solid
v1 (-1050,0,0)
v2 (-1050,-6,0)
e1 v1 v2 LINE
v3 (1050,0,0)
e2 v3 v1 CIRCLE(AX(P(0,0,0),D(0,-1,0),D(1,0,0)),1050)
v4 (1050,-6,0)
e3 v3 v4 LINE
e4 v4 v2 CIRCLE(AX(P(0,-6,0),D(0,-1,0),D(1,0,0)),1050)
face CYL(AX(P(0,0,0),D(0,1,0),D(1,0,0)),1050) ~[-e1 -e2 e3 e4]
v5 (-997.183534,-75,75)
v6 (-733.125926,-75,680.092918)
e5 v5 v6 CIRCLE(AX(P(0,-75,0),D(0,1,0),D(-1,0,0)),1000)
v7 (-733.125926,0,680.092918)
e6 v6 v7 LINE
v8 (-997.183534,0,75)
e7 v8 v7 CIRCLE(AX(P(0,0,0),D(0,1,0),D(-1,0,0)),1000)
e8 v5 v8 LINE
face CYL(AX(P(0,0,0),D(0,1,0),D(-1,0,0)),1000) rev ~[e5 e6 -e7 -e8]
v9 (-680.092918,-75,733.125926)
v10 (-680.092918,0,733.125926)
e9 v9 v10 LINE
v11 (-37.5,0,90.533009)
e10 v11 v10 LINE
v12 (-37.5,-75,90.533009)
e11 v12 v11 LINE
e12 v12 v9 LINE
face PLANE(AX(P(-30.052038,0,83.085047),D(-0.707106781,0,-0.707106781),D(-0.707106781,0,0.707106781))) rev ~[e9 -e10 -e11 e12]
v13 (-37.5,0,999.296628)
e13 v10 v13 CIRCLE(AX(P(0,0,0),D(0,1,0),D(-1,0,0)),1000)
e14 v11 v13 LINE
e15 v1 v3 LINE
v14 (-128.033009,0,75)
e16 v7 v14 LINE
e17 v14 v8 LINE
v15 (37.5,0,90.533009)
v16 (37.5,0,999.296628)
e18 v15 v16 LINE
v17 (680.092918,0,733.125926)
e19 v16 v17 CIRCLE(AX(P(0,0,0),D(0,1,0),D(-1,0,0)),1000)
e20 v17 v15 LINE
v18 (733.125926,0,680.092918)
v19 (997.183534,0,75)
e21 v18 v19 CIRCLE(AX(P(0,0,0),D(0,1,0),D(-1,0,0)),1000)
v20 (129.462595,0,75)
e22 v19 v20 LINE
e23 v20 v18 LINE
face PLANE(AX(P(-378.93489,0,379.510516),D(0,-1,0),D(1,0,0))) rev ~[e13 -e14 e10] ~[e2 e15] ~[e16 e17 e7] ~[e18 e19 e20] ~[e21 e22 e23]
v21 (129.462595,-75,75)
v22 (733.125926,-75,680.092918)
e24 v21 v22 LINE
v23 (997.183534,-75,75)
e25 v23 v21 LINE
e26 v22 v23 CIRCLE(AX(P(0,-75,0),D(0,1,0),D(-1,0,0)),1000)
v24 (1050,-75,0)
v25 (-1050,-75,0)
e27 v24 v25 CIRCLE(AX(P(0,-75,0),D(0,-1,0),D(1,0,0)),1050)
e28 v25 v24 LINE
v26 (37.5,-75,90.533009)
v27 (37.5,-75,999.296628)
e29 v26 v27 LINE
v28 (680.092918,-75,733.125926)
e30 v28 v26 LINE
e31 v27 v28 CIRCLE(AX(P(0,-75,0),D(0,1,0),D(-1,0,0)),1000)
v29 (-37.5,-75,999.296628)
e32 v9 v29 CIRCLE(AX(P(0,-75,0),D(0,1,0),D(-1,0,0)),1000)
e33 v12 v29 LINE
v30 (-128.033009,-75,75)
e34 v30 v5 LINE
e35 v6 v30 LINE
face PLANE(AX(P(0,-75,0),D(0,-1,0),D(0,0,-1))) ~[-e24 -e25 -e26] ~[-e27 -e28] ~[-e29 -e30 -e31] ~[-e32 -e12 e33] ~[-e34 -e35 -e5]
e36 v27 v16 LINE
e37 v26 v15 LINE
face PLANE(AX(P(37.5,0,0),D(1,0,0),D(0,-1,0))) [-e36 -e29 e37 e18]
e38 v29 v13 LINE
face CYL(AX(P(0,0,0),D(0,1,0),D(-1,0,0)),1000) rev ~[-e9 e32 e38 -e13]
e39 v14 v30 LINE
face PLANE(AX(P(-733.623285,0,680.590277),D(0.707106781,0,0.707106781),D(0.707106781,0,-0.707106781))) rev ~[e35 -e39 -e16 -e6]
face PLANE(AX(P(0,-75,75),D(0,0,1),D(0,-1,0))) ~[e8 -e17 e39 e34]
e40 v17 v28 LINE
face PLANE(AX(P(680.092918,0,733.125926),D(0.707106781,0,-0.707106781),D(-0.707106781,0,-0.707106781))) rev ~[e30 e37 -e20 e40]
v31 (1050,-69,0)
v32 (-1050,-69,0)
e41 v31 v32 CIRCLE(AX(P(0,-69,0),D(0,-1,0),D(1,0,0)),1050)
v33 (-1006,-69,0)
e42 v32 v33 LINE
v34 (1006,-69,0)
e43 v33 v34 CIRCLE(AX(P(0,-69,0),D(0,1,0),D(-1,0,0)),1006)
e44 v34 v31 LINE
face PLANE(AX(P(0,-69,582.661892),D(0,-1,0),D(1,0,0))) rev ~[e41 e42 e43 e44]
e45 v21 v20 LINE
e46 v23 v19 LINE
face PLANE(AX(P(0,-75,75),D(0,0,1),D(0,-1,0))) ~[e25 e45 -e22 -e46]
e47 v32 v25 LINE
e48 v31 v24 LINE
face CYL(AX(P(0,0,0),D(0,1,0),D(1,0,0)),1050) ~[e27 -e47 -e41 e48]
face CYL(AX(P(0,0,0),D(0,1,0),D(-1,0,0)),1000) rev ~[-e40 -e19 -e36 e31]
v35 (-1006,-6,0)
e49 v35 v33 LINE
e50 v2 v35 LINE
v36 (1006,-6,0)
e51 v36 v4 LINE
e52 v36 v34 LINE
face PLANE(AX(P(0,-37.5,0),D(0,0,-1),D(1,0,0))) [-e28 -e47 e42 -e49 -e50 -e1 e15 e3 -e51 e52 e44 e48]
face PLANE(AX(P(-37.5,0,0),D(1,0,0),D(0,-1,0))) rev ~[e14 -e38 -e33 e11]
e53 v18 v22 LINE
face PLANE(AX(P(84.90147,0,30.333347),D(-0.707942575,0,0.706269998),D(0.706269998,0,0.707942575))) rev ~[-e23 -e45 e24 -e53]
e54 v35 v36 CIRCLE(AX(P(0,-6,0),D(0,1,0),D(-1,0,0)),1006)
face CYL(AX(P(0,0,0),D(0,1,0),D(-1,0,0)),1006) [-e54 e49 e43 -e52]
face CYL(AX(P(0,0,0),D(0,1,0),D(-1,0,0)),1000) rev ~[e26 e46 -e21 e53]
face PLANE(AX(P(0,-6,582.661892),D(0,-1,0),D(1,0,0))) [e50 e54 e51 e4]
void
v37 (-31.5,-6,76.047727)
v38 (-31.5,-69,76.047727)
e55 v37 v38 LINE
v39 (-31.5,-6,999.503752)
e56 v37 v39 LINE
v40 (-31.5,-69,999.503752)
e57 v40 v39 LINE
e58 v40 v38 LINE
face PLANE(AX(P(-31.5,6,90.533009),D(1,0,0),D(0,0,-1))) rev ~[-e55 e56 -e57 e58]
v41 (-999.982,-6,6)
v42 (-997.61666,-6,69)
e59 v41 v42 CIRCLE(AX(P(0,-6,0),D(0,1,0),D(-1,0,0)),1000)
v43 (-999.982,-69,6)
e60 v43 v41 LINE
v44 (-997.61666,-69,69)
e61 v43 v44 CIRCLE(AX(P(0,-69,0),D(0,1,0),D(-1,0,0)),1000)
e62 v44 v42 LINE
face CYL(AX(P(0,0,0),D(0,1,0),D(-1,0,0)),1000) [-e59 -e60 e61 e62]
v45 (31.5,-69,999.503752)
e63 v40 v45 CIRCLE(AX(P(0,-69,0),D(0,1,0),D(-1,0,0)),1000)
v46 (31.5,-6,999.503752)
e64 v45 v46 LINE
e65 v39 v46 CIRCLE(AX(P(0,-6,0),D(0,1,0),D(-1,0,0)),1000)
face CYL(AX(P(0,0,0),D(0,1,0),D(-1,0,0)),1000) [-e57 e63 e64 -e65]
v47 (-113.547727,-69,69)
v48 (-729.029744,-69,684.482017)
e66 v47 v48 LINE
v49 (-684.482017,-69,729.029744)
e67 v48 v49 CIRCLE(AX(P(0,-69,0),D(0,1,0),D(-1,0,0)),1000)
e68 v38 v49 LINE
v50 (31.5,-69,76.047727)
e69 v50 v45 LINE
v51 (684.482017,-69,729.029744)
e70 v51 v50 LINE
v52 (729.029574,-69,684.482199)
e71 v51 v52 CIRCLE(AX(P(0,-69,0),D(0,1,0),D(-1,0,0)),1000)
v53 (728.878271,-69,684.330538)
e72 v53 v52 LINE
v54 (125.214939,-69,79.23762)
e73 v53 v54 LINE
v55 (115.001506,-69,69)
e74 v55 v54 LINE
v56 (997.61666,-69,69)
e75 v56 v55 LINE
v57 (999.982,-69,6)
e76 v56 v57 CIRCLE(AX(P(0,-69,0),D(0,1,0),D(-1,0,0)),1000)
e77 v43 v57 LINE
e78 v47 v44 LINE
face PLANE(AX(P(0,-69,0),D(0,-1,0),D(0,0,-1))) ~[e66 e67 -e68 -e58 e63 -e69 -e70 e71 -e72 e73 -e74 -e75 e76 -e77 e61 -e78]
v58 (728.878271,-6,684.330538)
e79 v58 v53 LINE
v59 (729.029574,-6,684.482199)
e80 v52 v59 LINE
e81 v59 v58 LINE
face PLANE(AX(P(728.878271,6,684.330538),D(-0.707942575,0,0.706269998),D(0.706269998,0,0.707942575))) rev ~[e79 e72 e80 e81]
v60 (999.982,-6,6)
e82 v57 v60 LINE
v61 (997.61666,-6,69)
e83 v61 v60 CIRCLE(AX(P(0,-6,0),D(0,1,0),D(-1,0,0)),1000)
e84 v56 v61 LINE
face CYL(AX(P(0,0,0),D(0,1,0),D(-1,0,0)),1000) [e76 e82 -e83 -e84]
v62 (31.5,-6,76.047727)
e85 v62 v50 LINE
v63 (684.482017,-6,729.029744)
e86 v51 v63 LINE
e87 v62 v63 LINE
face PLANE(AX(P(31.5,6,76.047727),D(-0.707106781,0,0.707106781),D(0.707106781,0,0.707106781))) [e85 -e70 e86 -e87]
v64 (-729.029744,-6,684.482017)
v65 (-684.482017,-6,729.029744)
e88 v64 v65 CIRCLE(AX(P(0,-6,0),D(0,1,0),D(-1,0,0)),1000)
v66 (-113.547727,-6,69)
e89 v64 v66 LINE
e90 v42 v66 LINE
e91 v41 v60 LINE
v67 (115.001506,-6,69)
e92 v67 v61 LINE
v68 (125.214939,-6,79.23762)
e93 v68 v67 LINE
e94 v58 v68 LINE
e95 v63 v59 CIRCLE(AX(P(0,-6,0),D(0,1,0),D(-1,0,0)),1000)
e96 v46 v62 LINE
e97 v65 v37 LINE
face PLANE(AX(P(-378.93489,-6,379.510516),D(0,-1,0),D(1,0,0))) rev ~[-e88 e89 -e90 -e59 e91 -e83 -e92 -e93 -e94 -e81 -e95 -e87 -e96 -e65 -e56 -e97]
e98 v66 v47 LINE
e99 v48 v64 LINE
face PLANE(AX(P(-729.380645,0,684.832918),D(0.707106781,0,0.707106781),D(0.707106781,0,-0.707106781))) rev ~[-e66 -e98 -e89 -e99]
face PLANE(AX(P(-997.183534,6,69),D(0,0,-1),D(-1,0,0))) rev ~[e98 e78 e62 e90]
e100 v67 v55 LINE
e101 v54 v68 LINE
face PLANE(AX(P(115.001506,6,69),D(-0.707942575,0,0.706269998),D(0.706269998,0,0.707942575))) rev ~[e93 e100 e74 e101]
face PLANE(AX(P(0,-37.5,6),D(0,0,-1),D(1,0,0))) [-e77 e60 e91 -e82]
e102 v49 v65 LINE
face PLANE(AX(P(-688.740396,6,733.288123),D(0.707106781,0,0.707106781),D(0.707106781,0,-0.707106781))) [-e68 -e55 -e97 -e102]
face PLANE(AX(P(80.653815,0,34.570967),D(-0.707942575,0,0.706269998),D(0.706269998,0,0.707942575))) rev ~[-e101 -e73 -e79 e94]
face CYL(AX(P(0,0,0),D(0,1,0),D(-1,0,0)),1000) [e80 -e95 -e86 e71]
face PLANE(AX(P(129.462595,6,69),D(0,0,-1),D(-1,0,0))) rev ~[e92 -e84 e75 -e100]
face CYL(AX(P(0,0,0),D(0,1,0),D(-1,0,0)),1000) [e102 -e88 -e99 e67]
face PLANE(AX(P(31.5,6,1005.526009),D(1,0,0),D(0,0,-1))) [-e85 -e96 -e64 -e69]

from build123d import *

# Parameters (mm, degrees)
F1_DEPTH     = 75
F2_T         = -6
F3_W         = 75
F3_H         = 75
F4_DEPTH     = 1000
F6_W         = 75
F6_H         = 75
F7_DEPTH     = 1000
F9_DEPTH     = 75
F11_DEPTH    = 75
F12_T        = 6
F12_T3_DEPTH = 87
F12_T6_ANGLE = 180.000000001
F12_T8_ANGLE = 180.000000001


# Not quite as in the source:
# - a shell that OpenCascade refuses in one call is made with other operations: the cavity is built on its own and cut out


with BuildPart() as f1:
    # F0 (on Front) → F1 (new body)
    with BuildSketch(Plane.XZ):
        with BuildLine():
            ThreePointArc((707.1067811865, 707.1067811865), (923.8795325113, 382.6834323651), (1000, 0))
            Line((1000, 0), (1050, 0))
            ThreePointArc((1050, 0), (0, 1050), (-1050, 0))
            Line((-1050, 0), (-1000, 0))
            ThreePointArc((-1000, 0), (-923.8795325113, 382.6834323651), (-707.1067811865, 707.1067811865))
            ThreePointArc((-707.1067811865, 707.1067811865), (-382.6834323651, 923.8795325113), (0, 1000))
            ThreePointArc((0, 1000), (382.6834323651, 923.8795325113), (707.1067811865, 707.1067811865))
        make_face()
    extrude(amount=F1_DEPTH)

    # F2
    f2_openings = [f1.faces().sort_by_distance(p)[0] for p in [
        (0, -37.5, 1050),
        (1025, -37.5, 0),
        (-1025, -37.5, 0),
    ]]
    offset(amount=F2_T, openings=f2_openings)

    # F3 (on Right) → F4 (join)
    with BuildSketch(Plane.YZ):
        with Locations((-37.5, 37.5)):
            Rectangle(F3_W, F3_H)
    extrude(amount=F4_DEPTH)

    # F5: F1 across plane


with BuildPart() as f1_1:
    add(f1.part)
    add(f1.part.mirror(Plane.YZ))

    # F6 (on face) → F7 (join)
    with BuildSketch(Plane(origin=(0, 0, 0), x_dir=(1, 0, 0), z_dir=(0, 0, -1))):
        with Locations((0, 37.5)):
            Rectangle(F6_W, F6_H)
    extrude(amount=-F7_DEPTH)

    # F8 (on face) → F9 (join)
    with BuildSketch(Plane.XZ):
        with BuildLine():
            Line((84.9014701911, 30.3333466038), (733.1259261111, 680.0929175221))
            ThreePointArc((733.1259261111, 680.0929175221), (707.1120975666, 707.1120975666), (680.0929175221, 733.1259261111))
            Line((680.0929175221, 733.1259261111), (-22.6996619852, 30.3333466038))
            Line((-22.6996619852, 30.3333466038), (84.9014701911, 30.3333466038))
        make_face()
        Polygon((-27.0138636644, 26.0191449246), (-22.6996619852, 30.3333466038), (-27.0138636644, 30.3333466038), align=None)
    extrude(amount=F9_DEPTH)

    # F10 (on Front) → F11 (join)
    with BuildSketch(Plane.XZ):
        Polygon((-97.2271824132, 44.1941738242), (-27.4779913529, 44.1941738242), (-30.0520382004, 83.0850467894), (-680.5902768921, 733.623285481), (-733.623285481, 680.5902768921), align=None)
    extrude(amount=F11_DEPTH)

    # F12: shell of thickness 6, made by hand


with BuildPart() as f12_core1:
    # F12_t2: copy of F1
    add(f1_1.part)

    # the walls: a layer under each face that stays
    f12_faces = [f12_core1.faces().sort_by_distance(p)[0] for p in [
        (0, 0, 525),
        (0, -37.5, 0),
        (0, -3, 1050),
        (-562.608271174, -37.5, 75),
        (-37.5, -37.5, 544.9148181113),
        (-382.6834323651, -37.5, 923.8795325113),
        (-916.5299048246, -37.5, 399.9661655218),
        (563.3230641949, -37.5, 75),
        (431.2942603709, -37.5, 377.5464587611),
        (916.5299048246, -37.5, 399.9661655218),
        (382.6834323651, -37.5, 923.8795325113),
        (37.5, -37.5, 544.9148181113),
        (358.7964587611, -37.5, 411.82946735),
        (-900, -6, 525),
        (0, -37.5, 1006),
        (-900, -69, 525),
        (0, -72, 1050),
        (0, -75, 525),
        (-430.57946735, -37.5, 377.5464587611),
        (-358.7964587611, -37.5, 411.82946735),
    ]]
    thicken(f12_faces, amount=-F12_T, mode=Mode.SUBTRACT)

    # F12_s4 → F12_t3 (cut)
    with BuildSketch(Plane.XZ.offset(-6)):
        Polygon((-128.0754349959, 75.0175735931), (-128.033008589, 69), (-113.5477272148, 69), (-123.7903679019, 79.2426406871), align=None)
        Polygon((-997.1237027469, 75.0555), (-997.183533759, 69), (-1003.6517512752, 69), (-1003.1666349615, 75.45), align=None)
        Polygon((-37.5175735931, 90.5754349959), (-31.5, 90.533008589), (-31.5, 76.0477272148), (-41.7426406871, 86.2903679019), align=None)
        Polygon((-37.55775, 999.236669836), (-31.5, 999.2966276337), (-31.5, 1005.5260092085), (-37.725, 1005.2924073995), align=None)
        Polygon((-680.0096855402, 733.1243649624), (-684.1734750272, 737.5246816678), (-688.7403961634, 733.2881233782), (-684.3355582092, 728.883285424), align=None)
        Polygon((-733.1243649624, 680.0096855402), (-737.5246816678, 684.1734750272), (-733.2881233782, 688.7403961634), (-728.883285424, 684.3355582092), align=None)
        Polygon((997.1237027469, 75.0555), (997.183533759, 69), (1003.6517512752, 69), (1003.1666349615, 75.45), align=None)
        Polygon((129.5050711853, 75.0176238001), (129.4625946308, 69), (115.0015064822, 69), (125.2149391782, 79.2376199873), align=None)
        Polygon((733.1244151101, 680.0097357472), (728.8782706586, 684.3305375094), (733.2831062303, 688.7458045437), (737.5246816678, 684.1734750272), align=None)
        Polygon((680.0096855402, 733.1243649624), (684.1734750272, 737.5246816678), (688.7403961634, 733.2881233782), (684.3355582092, 728.883285424), align=None)
        Polygon((37.55775, 999.236669836), (37.725, 1005.2924073995), (31.5, 1005.5260092085), (31.5, 999.2966276337), align=None)
        Polygon((37.5175735931, 90.5754349959), (31.5, 90.533008589), (31.5, 76.0477272148), (41.7426406871, 86.2903679019), align=None)
    extrude(amount=F12_T3_DEPTH, mode=Mode.SUBTRACT)

    # F12_s5 → F12_t6 (revolve, cut)
    with BuildSketch(Plane.XY):
        Polygon((-1006.06, -6.06), (-1006, 0), (-1000, 0), (-1000, -6), align=None)
    revolve(axis=Axis((0, -6, 0), (0, 1, 0)), revolution_arc=F12_T6_ANGLE, mode=Mode.SUBTRACT)

    # F12_s7 → F12_t8 (revolve, cut)
    with BuildSketch(Plane.XY):
        Polygon((-1006.06, -68.94), (-1000, -69), (-1000, -75), (-1006, -75), align=None)
    revolve(axis=Axis((0, -69, 0), (0, 1, 0)), revolution_arc=F12_T8_ANGLE, mode=Mode.SUBTRACT)


with BuildPart() as f1_2:
    add(f1_1.part)

    # what is left inside the walls is the cavity
    f12_cavity = [f12_core1.part.solids().sort_by_distance(p)[0] for p in [
        (0, -6.06, 337.333333),
    ]]
    add(f12_cavity, mode=Mode.SUBTRACT)


solid = f1_2.part
